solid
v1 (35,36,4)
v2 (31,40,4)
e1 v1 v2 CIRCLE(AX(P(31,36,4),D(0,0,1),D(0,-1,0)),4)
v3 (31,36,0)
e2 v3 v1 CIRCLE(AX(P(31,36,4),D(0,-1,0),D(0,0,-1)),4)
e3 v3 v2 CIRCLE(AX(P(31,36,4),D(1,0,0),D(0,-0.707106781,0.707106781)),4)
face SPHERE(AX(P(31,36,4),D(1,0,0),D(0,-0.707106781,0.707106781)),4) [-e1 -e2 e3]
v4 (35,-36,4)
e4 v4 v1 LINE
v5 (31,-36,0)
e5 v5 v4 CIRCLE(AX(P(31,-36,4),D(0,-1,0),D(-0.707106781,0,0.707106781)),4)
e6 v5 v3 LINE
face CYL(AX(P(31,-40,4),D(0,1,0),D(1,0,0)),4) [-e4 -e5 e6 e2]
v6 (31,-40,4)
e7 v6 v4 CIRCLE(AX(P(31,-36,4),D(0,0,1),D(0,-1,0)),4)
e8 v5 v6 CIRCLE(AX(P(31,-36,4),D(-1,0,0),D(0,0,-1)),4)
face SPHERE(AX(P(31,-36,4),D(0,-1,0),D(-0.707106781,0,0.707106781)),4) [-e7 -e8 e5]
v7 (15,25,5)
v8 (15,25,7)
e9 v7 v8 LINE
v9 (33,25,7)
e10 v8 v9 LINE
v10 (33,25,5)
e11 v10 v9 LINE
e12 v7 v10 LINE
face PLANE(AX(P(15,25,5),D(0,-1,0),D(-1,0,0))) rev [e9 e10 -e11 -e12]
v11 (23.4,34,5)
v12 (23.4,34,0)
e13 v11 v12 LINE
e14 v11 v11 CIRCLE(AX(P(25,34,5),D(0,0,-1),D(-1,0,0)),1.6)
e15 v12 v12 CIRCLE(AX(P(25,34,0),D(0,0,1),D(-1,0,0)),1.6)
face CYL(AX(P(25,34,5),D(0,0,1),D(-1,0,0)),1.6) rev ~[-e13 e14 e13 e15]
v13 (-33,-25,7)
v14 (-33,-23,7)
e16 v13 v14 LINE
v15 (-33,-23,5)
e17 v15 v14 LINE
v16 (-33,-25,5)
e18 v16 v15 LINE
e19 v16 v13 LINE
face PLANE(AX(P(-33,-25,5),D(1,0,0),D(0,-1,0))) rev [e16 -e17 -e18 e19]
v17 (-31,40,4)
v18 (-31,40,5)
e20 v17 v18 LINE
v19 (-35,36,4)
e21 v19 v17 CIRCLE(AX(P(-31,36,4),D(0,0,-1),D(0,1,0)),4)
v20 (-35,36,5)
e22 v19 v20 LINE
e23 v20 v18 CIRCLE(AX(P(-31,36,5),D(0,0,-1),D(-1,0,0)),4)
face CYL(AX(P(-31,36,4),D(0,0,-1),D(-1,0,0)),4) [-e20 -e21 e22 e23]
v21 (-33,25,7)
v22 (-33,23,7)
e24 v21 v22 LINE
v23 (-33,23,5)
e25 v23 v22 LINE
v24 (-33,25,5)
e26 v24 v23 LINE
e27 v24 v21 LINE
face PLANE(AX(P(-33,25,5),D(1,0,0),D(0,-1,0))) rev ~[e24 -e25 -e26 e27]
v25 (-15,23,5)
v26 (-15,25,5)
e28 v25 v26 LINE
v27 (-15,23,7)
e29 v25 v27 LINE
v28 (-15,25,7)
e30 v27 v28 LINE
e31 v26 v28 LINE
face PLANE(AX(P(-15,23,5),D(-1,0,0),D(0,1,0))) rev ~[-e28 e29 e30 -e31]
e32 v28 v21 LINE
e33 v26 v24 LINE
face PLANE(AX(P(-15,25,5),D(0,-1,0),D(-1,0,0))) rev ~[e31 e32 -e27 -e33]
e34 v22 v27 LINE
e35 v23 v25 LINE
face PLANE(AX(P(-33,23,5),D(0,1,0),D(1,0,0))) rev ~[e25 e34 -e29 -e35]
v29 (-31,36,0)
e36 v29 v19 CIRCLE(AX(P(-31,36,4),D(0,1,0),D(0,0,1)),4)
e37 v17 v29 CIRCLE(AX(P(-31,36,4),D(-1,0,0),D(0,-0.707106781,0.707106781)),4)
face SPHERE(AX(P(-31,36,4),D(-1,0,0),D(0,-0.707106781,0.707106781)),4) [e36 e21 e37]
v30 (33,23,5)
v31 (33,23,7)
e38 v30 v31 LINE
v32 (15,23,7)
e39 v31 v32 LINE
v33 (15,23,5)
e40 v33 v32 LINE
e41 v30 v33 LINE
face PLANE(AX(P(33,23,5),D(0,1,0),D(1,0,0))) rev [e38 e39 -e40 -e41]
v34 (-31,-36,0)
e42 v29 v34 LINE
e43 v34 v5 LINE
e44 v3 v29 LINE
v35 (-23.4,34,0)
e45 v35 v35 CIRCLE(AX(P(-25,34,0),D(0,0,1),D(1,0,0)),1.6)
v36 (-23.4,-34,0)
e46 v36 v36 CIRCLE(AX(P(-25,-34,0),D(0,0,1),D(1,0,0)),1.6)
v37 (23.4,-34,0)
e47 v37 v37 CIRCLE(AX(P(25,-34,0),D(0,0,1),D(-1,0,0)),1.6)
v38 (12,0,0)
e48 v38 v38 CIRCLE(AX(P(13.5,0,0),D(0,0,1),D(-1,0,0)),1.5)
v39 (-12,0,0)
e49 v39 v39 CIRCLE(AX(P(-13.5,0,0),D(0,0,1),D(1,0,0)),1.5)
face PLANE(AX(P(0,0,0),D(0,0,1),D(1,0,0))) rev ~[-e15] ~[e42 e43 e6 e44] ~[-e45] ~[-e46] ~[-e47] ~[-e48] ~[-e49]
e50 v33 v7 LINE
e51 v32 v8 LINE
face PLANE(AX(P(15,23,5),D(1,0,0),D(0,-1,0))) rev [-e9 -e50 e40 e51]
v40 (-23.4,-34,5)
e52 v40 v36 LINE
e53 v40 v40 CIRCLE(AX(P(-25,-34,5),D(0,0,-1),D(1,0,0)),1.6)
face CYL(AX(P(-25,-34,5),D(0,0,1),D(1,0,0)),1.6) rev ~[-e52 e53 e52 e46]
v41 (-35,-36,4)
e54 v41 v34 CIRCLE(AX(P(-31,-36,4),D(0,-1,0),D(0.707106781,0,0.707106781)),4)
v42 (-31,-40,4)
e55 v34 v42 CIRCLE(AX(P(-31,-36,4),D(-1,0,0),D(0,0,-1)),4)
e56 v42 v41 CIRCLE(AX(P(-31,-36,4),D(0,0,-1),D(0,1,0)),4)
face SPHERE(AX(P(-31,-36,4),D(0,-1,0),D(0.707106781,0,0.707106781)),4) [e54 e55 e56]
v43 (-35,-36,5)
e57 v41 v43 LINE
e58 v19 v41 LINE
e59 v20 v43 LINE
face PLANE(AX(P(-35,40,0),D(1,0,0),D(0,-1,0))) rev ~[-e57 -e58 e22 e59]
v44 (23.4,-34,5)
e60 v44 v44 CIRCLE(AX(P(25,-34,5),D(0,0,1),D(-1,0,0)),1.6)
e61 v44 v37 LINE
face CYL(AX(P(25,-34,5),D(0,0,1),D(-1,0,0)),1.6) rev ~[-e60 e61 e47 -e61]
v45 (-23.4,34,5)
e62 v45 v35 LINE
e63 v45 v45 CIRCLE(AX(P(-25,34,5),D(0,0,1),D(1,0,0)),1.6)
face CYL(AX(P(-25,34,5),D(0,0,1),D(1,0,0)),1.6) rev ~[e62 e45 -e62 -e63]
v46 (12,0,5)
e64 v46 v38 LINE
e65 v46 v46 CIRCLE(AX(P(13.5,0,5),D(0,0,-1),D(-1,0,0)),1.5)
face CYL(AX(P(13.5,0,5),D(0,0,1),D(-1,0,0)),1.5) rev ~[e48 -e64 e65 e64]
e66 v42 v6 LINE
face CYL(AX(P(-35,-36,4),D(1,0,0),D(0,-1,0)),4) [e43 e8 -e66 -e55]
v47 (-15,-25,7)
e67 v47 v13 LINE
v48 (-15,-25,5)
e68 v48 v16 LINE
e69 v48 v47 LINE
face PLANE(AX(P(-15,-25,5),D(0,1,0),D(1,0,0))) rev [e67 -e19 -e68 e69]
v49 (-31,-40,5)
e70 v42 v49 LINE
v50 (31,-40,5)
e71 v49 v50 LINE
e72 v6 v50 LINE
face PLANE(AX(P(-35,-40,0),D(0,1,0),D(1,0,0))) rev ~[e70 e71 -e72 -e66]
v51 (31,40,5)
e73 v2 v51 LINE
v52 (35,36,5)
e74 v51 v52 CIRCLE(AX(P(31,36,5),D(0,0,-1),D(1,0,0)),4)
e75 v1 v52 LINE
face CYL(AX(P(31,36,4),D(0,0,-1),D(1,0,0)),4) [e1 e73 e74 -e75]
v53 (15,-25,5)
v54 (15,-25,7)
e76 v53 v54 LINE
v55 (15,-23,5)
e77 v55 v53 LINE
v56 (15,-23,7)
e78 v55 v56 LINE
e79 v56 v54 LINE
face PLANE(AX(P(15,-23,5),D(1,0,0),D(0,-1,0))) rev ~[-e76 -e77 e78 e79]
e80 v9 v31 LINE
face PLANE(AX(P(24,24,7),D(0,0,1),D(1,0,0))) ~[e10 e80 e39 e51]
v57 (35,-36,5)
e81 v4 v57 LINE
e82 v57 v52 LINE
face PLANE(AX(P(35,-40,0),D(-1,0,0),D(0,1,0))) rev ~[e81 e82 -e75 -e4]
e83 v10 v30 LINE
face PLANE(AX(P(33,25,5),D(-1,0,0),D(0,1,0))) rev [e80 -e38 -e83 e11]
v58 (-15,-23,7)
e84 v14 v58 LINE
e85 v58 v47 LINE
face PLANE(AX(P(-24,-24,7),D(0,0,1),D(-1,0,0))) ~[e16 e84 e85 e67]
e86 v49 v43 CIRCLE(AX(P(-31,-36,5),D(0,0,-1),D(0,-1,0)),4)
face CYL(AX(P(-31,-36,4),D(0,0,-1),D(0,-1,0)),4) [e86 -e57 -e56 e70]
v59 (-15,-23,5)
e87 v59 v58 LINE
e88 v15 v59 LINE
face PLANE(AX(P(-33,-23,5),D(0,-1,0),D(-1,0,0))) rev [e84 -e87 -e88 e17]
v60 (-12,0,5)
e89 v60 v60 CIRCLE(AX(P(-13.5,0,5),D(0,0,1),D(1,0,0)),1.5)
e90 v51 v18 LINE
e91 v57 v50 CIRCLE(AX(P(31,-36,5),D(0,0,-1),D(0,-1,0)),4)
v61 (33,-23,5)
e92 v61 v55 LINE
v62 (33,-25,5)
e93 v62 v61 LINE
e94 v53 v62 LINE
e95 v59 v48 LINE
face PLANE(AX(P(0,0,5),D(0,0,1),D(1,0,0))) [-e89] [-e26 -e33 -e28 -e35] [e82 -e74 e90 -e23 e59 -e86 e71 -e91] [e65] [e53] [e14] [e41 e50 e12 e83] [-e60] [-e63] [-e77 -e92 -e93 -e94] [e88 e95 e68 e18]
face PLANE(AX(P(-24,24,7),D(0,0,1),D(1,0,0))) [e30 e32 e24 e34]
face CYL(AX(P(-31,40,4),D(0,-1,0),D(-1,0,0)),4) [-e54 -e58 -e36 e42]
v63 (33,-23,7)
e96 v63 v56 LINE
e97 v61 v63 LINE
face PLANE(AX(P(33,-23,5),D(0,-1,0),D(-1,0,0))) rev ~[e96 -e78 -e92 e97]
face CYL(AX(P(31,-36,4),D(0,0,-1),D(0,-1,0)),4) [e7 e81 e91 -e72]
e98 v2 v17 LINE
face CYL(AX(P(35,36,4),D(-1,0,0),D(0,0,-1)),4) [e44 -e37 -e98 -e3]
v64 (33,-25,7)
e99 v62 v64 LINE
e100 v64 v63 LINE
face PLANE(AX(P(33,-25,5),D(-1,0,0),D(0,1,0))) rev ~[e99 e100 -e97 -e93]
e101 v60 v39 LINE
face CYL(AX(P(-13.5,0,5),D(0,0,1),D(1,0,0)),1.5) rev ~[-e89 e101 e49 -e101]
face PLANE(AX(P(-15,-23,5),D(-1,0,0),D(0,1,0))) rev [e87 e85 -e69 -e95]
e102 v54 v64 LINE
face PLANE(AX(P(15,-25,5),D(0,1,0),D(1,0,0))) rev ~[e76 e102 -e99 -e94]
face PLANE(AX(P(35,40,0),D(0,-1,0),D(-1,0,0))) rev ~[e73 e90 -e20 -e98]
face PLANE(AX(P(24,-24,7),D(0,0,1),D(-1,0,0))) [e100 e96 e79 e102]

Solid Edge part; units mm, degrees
sketch "Sketch1" plane through (0, 0, 0) normal (0, 0, 1) x (1, 0, 0)
  line L0 (-35, -40) -> (35, -40)
  line L1 (35, -40) -> (35, 40)
  line L2 (35, 40) -> (-35, 40)
  line L3 (-35, 40) -> (-35, -40)
  dimension "D1" = 80
  dimension "D2" = 70
extrude "Protrusion1" add sketch "Sketch1" along normal blind 5
sketch "Sketch2" plane through (0, 0, 5) normal (0, 0, 1) x (1, 0, 0)
  circle A0 centre (-25, 34) radius 1.6
  dimension "D1" = 6
  dimension "D2" = 10
  dimension "D3" = 3.2
extrude "Cutout1" cut sketch "Sketch2" against normal through all
mirror "Mirror1" about plane through (0, 0, 0) normal (1, 0, 0) of "Cutout1"
mirror "Mirror2" about plane through (0, 0, 0) normal (0, -1, 0) of "Cutout1", "Mirror1"
sketch "Sketch3" plane through (0, 0, 5) normal (0, 0, 1) x (1, 0, 0)
  circle A0 centre (-13.5, 0) radius 1.5
  dimension "D1" = 3
  dimension "D2" = 13.5
extrude "Cutout2" cut sketch "Sketch3" against normal through all
mirror "Mirror3" about plane through (0, 0, 0) normal (1, 0, 0) of "Cutout2"
sketch "Sketch4" plane through (0, 0, 5) normal (0, 0, 1) x (1, 0, 0)
  line L0 (-33, 23) -> (-15, 23)
  line L1 (-15, 23) -> (-15, 25)
  line L2 (-15, 25) -> (-33, 25)
  line L3 (-33, 25) -> (-33, 23)
  dimension "D1" = 18
  dimension "D2" = 2
  dimension "D3" = 2
  dimension "D4" = 15
extrude "Extrusionsausprägung_2" add sketch "Sketch4" along normal blind 2
mirror "Mirror4" about plane through (0, 0, 0) normal (0, -1, 0) of "Extrusionsausprägung_2"
mirror "Mirror5" about plane through (0, 0, 0) normal (1, 0, 0) of "Mirror4", "Extrusionsausprägung_2"
fillet "Verrundung_1" radius 4 4 edges at (0, 40, 0) (35, 0, 0) (-35, 0, 0) (0, -40, 0)
fillet "Verrundung_2" radius 4 8 edges at (33.8284, 38.8284, 1.1716) (35, 40, 4.5) (33.8284, -38.8284, 1.1716) (35, -40, 4.5) (-33.8284, -38.8284, 1.1716) (-35, -40, 4.5) (-33.8284, 38.8284, 1.1716) (-35, 40, 4.5)
properties material "Nylon, allgemein"
